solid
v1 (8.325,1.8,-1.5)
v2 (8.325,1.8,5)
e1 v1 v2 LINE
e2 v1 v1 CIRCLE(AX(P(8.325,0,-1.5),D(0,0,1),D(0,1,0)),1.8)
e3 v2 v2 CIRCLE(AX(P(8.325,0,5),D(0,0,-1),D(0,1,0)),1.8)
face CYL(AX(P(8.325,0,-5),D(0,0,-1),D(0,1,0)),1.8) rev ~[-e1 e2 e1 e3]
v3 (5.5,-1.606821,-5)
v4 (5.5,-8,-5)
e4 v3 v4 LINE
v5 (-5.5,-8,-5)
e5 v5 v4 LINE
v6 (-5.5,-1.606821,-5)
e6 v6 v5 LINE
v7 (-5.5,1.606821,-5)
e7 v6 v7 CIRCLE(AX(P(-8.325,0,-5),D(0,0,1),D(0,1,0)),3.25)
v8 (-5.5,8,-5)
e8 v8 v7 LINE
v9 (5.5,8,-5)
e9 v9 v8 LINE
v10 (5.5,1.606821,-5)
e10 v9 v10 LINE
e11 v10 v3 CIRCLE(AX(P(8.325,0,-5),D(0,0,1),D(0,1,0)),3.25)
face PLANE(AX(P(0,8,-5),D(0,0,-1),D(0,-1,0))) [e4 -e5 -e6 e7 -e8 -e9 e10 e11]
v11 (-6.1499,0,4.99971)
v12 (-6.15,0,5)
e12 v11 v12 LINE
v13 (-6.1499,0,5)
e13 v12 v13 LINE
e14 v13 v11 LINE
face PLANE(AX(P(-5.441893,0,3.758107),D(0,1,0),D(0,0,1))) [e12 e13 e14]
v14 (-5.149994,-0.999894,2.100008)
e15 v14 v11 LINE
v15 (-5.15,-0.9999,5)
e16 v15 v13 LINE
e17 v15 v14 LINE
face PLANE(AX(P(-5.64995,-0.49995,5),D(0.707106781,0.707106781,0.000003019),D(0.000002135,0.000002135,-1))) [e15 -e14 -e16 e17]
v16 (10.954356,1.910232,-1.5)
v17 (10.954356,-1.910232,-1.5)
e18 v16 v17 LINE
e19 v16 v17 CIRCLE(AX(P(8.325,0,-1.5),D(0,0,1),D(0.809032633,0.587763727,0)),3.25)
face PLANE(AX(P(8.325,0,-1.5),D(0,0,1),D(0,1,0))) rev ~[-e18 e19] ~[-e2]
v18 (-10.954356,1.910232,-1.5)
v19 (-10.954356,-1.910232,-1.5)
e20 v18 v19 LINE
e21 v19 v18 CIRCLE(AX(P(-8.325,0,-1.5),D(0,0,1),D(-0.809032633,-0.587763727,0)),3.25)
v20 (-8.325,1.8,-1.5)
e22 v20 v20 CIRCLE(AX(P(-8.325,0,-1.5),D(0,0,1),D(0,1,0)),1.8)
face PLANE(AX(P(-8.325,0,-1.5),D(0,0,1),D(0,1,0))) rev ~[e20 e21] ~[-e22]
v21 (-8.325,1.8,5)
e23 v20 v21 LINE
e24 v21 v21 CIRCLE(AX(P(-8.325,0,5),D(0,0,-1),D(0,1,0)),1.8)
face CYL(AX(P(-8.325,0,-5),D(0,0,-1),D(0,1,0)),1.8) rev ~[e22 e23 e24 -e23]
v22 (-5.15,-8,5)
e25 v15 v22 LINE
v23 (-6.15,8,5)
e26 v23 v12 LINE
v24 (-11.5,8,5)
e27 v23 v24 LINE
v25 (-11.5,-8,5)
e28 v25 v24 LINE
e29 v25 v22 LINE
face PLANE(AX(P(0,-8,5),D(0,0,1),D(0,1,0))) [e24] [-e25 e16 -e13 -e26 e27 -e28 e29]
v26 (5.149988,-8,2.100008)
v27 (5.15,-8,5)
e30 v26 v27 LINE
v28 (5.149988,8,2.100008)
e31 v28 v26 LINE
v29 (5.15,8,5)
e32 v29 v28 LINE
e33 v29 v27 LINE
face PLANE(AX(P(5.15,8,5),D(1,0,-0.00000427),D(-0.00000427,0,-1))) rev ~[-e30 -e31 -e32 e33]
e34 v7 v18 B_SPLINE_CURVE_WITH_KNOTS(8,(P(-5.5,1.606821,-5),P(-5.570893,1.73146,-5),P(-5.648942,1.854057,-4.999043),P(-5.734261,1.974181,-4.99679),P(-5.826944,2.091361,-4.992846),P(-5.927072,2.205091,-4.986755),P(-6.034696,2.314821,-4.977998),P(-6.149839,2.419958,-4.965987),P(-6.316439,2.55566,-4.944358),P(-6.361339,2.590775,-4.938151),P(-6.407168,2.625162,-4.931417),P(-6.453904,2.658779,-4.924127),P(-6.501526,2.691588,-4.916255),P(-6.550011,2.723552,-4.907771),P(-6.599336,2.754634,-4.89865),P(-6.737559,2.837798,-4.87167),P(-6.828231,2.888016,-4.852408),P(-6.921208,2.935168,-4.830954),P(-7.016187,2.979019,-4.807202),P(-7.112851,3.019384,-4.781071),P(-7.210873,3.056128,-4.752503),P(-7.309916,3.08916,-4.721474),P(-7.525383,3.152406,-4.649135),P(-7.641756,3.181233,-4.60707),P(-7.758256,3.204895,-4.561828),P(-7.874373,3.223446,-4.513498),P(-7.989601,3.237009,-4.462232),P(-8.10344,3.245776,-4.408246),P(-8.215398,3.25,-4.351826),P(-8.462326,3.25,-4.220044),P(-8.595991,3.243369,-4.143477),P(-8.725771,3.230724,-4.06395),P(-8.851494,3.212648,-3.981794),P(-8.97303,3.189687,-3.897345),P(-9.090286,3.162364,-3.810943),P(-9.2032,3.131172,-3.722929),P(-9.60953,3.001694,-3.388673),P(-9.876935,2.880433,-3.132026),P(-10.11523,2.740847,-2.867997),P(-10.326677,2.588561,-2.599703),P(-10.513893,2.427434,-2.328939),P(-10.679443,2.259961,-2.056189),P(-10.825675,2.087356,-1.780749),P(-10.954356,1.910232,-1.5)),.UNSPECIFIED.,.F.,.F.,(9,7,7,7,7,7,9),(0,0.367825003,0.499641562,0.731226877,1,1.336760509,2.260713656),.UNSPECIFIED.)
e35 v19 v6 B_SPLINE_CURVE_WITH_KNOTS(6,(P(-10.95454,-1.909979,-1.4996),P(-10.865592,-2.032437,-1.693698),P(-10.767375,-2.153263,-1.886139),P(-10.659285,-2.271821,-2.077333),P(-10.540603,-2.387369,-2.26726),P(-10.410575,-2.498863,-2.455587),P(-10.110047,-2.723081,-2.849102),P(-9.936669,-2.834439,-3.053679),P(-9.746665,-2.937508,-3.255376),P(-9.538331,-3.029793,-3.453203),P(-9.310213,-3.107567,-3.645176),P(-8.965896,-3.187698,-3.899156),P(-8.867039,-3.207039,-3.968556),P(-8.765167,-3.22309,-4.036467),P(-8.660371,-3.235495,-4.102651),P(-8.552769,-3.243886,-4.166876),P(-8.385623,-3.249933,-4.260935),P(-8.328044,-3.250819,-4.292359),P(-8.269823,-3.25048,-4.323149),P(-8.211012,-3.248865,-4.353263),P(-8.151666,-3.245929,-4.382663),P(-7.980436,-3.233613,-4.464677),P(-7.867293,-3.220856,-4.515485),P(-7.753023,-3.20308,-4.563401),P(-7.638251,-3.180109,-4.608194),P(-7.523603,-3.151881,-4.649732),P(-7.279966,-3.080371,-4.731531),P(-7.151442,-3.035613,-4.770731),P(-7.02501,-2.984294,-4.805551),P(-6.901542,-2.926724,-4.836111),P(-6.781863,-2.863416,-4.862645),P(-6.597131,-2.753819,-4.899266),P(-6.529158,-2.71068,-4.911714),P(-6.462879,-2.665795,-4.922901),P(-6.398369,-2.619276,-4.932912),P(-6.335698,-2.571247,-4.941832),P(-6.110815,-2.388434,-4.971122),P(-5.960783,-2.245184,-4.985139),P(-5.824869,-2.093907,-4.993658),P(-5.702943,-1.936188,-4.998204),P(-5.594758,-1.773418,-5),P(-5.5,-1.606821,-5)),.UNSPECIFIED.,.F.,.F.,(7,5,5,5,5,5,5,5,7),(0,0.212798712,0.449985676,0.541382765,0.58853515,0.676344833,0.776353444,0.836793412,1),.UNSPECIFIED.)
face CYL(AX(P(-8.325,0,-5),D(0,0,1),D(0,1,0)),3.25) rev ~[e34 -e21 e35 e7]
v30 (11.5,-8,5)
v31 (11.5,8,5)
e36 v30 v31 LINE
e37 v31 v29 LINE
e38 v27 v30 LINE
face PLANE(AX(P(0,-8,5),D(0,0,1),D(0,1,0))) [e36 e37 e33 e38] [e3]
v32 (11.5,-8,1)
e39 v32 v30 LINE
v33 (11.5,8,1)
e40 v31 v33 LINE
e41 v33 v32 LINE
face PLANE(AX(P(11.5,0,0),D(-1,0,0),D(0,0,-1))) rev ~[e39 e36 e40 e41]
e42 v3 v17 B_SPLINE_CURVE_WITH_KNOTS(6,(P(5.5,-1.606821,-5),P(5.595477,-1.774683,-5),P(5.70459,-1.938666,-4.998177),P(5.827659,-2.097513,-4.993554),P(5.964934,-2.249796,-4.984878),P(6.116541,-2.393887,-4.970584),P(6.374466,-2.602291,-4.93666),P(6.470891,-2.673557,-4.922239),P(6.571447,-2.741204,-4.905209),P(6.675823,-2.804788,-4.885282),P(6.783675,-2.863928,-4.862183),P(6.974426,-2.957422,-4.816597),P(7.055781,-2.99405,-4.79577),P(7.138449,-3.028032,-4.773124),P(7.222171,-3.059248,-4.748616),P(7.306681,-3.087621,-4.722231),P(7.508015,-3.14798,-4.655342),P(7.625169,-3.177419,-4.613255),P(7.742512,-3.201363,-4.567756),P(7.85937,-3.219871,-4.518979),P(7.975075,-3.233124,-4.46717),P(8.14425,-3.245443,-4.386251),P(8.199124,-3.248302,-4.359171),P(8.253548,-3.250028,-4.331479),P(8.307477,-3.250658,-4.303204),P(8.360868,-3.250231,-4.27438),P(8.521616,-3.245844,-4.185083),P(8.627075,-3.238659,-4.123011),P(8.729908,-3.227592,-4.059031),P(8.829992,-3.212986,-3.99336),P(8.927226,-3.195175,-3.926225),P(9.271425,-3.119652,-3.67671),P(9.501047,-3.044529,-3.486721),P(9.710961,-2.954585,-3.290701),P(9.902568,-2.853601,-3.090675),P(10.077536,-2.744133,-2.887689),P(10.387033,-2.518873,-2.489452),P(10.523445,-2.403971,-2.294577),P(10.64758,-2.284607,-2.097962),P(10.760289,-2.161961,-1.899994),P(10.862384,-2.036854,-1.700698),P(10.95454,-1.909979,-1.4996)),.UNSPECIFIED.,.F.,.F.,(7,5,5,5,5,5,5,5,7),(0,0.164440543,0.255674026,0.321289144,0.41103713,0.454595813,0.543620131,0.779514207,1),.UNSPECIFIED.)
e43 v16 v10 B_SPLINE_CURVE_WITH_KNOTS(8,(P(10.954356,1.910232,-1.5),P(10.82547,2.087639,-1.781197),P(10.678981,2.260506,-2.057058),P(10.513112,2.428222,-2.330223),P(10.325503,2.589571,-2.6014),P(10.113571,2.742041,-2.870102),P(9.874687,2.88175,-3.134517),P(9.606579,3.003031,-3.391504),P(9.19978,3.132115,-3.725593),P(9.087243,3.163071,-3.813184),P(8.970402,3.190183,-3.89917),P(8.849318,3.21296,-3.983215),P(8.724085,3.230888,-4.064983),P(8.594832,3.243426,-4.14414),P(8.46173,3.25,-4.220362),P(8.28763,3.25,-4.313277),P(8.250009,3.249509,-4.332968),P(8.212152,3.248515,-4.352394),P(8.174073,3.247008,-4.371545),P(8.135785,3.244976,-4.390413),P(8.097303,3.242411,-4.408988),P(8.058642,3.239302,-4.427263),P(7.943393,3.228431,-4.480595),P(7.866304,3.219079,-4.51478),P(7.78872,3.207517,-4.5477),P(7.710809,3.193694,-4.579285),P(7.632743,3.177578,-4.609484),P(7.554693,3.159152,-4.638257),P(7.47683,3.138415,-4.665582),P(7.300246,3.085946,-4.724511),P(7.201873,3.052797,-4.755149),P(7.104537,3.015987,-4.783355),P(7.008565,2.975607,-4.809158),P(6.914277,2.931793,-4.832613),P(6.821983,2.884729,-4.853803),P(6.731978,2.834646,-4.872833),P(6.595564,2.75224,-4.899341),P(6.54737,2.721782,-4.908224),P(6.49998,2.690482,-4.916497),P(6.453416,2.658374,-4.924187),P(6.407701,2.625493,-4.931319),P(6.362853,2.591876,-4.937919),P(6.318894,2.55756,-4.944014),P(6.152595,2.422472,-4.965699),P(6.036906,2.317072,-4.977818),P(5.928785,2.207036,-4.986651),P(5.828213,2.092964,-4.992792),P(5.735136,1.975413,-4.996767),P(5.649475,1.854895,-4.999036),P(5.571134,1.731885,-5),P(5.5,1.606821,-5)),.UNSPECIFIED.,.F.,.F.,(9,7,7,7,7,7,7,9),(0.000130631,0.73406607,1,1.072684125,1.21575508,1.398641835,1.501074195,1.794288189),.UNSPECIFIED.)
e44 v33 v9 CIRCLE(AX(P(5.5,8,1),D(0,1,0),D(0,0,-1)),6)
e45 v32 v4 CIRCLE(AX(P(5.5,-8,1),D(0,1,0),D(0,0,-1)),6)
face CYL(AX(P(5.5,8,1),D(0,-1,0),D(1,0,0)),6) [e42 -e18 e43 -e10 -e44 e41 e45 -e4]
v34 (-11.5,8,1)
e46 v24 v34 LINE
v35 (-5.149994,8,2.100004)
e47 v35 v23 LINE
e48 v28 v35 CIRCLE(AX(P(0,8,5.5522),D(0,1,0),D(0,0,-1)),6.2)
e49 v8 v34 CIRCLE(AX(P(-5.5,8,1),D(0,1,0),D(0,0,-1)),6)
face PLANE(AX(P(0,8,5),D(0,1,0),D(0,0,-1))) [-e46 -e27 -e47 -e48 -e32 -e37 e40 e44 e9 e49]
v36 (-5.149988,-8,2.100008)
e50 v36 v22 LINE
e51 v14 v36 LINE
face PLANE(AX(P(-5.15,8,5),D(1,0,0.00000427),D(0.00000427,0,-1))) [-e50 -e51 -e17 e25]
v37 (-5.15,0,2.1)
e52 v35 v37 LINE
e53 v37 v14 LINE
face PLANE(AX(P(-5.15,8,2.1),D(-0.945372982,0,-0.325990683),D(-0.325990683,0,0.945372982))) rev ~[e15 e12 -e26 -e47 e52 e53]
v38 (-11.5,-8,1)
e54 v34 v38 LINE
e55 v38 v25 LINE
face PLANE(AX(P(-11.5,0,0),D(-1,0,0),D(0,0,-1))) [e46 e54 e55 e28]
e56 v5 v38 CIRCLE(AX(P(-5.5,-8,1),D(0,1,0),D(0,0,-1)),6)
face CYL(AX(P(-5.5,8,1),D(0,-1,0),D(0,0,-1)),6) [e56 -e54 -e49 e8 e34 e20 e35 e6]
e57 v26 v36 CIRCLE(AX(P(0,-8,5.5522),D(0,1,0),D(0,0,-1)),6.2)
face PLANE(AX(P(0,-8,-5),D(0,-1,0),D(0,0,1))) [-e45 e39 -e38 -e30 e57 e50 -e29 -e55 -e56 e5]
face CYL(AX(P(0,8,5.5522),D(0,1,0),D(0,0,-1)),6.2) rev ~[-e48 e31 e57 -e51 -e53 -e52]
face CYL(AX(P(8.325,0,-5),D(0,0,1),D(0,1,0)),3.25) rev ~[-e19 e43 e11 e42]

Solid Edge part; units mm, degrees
sketch "Sketch1" plane through (0, 0, 0) normal (1, 0, 0) x (0, 1, 0)
  line L0 (-8, 5) -> (8, 5)
  line L1 (8, 5) -> (8, -5)
  line L2 (8, -5) -> (-8, -5)
  line L3 (-8, -5) -> (-8, 5)
  dimension "D1" = 10
  dimension "D2" = 16
extrude "Protrusion1" add sketch "Sketch1" along normal mid plane 23
sketch "Sketch2" plane through (0, 8, 0) normal (0, 1, 0) x (0, 0, -1)
  line L0 (-5, 5.15) -> (-5, -5.15)
  line L1 (-5, -5.15) -> (-2.1, -5.15)
  arc A0 (-2.1, -5.15) -> (-2.1, 5.15) centre (-5.5522, 0) ccw
  line L2 (-5, 5.15) -> (-2.1, 5.15)
  dimension "D1" = 10.3
  dimension "D2" = 6.2
  dimension "D3" = 2.9
extrude "Extrusionsausschnitt_1" cut sketch "Sketch2" against normal blind 22.6589
fillet "Verrundung_1" radius 6 2 edges at (-11.5, 0, -5) (11.5, 0, -5)
hole "Bohrung_1" at (-8.325, 0, -5) direction (0, 0, 1) diameter 3.6 end through all counterbore diameter 6.5 counterbore depth 3.5
hole "Hole1" at (8.325, 0, -5) direction (0, 0, 1) diameter 3.6 end through all counterbore diameter 6.5 counterbore depth 3.5
sketch "Sketch3" plane through (0, 8, 0) normal (0, 1, 0) x (-1, 0, 0)
  line L0 (5.15, 2.1) -> (6.15, 5)
  line L1 (6.15, 5) -> (5.15, 5)
  line L2 (5.15, 5) -> (5.15, 2.1)
  dimension "D1" = 1
extrude "Extrusionsausschnitt_2" cut sketch "Sketch3" against normal blind 8
chamfer "Fase_1" distance 1 angle 45 1 edges at (-5.15, 0, 3.55)
